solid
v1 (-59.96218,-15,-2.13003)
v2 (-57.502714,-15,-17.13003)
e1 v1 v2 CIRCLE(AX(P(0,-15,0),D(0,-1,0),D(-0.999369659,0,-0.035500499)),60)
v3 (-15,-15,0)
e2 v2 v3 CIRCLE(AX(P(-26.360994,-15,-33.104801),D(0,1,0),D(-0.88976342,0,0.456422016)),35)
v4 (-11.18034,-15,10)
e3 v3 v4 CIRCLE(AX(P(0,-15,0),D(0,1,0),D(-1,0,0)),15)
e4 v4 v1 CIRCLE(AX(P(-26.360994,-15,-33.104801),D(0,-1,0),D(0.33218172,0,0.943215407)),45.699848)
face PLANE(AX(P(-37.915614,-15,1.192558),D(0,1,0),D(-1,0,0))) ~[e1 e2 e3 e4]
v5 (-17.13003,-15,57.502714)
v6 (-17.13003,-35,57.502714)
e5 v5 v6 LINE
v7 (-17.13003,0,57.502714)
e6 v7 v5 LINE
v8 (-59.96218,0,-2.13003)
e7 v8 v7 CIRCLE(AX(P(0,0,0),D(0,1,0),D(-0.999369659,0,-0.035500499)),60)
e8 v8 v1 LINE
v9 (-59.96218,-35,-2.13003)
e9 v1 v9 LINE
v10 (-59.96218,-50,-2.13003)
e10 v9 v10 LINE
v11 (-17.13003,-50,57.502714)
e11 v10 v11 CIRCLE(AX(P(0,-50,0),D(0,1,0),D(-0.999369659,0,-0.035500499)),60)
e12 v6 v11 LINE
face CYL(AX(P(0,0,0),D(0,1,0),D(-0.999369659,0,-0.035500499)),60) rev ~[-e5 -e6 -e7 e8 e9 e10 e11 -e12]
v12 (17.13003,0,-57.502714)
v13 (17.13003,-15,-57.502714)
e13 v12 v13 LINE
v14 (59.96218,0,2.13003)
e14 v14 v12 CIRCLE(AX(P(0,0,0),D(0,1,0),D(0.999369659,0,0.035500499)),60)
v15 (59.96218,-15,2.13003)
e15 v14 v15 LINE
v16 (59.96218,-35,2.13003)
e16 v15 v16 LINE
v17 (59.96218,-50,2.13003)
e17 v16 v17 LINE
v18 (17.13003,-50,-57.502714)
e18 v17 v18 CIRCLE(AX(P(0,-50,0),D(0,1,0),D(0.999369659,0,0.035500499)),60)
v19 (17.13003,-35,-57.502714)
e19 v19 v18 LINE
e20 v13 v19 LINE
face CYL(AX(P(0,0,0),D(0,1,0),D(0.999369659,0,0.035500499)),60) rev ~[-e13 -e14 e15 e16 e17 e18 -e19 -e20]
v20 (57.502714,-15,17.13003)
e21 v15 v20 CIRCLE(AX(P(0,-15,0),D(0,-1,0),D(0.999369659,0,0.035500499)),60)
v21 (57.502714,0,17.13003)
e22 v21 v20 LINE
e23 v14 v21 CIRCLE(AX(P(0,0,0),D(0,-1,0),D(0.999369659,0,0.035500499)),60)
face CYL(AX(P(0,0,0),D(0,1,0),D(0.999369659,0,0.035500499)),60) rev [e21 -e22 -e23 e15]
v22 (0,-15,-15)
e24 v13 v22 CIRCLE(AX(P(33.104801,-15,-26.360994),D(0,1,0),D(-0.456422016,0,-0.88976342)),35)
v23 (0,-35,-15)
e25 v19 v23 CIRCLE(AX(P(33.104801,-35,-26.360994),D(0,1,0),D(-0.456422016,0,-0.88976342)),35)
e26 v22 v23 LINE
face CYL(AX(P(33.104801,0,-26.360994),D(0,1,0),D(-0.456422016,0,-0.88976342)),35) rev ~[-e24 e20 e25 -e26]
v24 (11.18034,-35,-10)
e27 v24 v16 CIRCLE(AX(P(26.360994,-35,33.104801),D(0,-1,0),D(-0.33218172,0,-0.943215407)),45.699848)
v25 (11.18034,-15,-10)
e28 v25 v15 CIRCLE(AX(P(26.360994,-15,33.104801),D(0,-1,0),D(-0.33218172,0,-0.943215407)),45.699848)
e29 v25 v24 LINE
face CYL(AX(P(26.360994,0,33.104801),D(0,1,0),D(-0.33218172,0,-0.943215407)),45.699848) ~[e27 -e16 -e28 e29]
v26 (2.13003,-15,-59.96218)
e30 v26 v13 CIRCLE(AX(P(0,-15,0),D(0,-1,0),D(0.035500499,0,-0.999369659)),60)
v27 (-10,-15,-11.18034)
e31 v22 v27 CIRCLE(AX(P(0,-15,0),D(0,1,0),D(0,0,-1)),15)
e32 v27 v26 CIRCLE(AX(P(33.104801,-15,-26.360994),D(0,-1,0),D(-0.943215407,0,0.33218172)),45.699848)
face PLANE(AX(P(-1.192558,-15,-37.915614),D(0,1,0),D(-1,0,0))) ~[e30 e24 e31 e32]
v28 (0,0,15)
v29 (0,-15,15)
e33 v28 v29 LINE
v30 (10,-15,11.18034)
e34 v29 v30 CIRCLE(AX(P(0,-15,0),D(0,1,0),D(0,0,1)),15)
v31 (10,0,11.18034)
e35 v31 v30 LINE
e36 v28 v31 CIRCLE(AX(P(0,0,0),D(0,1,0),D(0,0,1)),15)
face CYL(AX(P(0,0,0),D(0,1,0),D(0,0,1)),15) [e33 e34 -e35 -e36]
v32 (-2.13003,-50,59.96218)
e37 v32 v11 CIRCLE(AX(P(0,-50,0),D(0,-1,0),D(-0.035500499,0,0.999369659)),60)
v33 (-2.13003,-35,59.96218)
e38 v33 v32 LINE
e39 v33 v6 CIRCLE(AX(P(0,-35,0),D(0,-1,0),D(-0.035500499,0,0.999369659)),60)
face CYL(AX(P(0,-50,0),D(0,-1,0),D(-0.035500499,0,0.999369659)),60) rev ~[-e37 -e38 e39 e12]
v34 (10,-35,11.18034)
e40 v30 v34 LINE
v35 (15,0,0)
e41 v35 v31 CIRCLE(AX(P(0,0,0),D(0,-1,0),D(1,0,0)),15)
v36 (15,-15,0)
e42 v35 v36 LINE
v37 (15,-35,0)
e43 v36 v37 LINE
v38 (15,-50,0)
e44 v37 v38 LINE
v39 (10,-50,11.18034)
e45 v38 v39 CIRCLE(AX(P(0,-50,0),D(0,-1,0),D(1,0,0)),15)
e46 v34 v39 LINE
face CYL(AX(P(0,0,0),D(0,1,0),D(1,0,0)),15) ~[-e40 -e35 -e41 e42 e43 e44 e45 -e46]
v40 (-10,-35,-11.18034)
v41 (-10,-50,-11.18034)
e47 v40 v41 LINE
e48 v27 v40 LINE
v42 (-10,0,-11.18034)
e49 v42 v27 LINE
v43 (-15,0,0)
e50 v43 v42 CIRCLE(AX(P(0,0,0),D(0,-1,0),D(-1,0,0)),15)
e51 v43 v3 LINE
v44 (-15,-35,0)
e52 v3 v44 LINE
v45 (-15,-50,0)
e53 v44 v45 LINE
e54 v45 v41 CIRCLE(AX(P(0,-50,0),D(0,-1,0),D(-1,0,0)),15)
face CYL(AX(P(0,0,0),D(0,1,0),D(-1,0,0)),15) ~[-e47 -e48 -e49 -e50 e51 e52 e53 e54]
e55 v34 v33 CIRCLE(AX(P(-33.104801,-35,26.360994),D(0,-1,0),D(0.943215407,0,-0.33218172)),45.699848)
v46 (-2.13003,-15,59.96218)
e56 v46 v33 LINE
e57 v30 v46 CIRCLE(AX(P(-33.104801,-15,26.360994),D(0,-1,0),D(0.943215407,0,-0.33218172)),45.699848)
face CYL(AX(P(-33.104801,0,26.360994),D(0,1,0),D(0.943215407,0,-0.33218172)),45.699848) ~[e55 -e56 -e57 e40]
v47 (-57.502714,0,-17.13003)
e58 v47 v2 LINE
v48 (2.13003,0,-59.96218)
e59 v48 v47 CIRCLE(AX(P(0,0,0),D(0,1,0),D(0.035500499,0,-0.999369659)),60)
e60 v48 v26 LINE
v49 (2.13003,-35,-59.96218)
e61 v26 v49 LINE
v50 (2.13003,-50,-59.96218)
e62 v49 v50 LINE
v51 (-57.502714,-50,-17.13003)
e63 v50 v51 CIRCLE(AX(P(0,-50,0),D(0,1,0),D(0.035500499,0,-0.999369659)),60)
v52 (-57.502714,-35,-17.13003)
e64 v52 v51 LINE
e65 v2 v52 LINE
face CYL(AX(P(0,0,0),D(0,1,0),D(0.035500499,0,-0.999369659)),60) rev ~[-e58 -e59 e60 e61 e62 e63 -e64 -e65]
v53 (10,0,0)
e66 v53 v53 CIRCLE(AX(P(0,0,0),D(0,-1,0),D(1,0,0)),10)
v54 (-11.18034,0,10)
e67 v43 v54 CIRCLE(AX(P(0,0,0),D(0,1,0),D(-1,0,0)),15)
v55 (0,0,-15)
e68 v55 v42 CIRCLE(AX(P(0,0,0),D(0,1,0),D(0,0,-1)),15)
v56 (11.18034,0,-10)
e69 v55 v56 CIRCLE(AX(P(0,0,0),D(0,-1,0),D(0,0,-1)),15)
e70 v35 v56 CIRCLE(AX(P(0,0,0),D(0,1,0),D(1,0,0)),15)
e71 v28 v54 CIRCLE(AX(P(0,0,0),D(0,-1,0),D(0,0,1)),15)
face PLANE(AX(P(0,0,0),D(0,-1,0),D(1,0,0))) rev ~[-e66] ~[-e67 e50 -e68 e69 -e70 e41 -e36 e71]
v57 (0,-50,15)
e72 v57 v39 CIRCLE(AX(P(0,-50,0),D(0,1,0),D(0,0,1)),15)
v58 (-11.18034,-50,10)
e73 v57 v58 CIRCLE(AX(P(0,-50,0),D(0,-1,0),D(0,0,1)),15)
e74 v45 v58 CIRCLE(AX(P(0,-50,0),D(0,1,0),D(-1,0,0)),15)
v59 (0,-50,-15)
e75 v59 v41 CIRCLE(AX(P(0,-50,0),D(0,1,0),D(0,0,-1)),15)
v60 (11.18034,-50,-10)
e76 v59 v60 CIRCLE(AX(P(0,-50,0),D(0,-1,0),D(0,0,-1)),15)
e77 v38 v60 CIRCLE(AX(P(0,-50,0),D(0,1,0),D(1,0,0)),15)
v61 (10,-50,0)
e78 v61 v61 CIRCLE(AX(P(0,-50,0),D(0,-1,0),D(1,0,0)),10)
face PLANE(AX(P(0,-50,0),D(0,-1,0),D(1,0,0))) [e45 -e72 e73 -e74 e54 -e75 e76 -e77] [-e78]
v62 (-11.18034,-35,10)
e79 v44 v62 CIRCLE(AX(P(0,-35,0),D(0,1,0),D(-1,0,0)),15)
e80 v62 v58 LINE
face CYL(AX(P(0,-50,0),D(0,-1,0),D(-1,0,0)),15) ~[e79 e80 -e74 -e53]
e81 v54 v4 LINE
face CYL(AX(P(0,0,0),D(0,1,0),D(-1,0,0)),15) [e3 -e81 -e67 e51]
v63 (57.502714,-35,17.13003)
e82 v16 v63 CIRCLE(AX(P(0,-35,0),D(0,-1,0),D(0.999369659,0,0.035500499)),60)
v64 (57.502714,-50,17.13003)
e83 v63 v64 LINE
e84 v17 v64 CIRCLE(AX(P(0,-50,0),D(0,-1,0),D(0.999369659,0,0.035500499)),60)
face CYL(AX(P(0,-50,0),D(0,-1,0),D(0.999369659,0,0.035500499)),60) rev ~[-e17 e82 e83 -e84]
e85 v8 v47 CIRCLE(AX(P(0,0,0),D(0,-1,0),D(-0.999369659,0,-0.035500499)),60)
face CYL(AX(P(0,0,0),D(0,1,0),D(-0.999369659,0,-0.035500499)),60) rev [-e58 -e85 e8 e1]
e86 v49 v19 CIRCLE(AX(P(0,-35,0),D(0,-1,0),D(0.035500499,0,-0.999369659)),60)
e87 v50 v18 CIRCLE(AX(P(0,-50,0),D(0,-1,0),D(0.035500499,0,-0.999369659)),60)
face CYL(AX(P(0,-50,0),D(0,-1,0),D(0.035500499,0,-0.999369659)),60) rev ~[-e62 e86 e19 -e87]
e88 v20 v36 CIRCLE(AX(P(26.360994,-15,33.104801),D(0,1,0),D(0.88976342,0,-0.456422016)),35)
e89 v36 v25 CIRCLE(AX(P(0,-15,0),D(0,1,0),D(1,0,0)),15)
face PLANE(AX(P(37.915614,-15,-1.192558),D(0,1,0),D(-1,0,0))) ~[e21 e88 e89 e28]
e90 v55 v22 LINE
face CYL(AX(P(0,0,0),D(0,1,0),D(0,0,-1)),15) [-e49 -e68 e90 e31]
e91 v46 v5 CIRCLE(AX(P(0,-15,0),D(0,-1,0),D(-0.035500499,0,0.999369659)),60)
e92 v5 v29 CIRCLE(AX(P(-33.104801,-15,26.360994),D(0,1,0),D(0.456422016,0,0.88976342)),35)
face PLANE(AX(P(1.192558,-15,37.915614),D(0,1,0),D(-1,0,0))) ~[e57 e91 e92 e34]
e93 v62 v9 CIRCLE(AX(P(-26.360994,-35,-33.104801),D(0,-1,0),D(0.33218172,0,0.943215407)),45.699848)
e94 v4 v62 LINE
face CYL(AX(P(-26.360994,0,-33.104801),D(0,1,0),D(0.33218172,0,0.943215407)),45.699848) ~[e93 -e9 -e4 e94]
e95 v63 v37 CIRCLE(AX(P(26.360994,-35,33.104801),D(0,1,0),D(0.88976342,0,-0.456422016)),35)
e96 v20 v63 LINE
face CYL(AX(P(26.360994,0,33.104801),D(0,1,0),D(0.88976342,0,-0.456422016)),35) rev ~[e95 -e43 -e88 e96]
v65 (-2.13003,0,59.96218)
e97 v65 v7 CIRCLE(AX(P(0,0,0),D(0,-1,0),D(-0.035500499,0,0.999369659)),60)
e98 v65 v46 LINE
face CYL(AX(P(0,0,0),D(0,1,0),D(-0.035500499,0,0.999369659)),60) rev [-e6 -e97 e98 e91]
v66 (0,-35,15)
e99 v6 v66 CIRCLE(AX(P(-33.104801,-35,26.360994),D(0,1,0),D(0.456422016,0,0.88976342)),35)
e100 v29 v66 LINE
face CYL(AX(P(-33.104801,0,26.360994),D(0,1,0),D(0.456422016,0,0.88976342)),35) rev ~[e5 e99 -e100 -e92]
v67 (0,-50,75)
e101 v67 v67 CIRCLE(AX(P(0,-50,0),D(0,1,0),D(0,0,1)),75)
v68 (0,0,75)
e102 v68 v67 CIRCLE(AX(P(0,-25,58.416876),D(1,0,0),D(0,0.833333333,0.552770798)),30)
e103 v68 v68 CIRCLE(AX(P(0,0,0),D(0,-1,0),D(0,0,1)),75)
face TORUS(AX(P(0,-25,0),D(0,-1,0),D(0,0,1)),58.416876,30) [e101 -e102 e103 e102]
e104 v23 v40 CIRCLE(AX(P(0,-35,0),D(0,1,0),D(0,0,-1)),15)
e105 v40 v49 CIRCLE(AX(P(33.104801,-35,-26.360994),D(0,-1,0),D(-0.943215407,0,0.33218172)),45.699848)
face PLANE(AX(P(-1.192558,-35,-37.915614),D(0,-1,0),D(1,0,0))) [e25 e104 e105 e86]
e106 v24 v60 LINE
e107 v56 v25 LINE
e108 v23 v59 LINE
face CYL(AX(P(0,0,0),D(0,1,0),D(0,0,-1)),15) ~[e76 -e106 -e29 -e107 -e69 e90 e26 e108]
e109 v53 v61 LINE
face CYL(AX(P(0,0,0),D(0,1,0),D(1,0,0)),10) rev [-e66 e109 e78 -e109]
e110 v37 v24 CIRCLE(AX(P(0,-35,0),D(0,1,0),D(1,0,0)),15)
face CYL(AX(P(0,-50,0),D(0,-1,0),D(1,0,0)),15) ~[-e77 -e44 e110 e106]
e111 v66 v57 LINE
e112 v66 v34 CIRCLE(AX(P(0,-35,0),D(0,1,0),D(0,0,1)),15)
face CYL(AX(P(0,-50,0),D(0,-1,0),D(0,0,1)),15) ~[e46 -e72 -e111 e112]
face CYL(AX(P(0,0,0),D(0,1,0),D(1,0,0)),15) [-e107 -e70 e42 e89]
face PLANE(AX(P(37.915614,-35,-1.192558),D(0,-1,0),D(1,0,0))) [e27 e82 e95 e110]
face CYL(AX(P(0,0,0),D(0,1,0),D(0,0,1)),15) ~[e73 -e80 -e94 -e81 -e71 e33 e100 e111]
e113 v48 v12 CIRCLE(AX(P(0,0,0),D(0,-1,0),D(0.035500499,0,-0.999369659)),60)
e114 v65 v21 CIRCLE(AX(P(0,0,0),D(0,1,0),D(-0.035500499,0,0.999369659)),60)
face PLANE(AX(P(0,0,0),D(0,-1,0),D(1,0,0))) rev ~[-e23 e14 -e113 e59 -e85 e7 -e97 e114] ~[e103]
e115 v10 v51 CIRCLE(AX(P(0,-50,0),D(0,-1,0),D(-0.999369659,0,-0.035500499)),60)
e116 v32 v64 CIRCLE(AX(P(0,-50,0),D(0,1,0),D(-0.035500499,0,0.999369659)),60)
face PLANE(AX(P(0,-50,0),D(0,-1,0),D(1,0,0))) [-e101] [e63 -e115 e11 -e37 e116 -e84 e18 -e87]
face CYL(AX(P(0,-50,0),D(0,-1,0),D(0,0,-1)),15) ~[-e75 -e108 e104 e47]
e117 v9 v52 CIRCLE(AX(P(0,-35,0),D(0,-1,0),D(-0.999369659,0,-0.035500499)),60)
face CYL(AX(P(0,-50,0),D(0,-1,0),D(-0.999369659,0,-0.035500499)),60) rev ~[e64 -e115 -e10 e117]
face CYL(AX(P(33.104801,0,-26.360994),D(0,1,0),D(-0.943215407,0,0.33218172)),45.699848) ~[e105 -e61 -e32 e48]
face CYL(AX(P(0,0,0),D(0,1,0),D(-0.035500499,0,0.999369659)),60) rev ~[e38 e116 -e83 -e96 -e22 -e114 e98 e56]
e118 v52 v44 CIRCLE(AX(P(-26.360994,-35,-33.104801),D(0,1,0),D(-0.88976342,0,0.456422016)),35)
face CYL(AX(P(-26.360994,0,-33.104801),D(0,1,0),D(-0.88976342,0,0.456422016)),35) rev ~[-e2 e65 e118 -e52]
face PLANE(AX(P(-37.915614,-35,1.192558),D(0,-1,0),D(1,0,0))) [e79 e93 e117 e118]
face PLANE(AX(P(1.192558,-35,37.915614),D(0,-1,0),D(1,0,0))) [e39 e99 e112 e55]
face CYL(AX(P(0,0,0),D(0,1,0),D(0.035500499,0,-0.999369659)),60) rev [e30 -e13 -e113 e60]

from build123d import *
from build123d import SkipClean  # not in build123d's __all__

# Parameters (mm, degrees)
F0_R     = 75
F0_R_2   = 10
F1_DEPTH = 50
F6_DEPTH = 15


# Not quite as in the source:
# - a pattern or mirror of a feature is missing from the dataset's text; its kind, count and spacing are read off the source's solid


with BuildPart() as f1:
    # F0 (on Front) → F1 (new body)
    with BuildSketch(Plane.XZ):
        Circle(F0_R)
        with BuildLine():
            ThreePointArc((-57.5027136201, -17.1300299569), (-39.4445240133, -0.6421875508), (-15, 0))
            ThreePointArc((-15, 0), (-13.6930639376, -6.123724357), (-10, -11.1803398875))
            ThreePointArc((-10, -11.1803398875), (-11.2445250944, -37.3888406037), (2.1300299569, -59.9621795166))
            ThreePointArc((2.1300299569, -59.9621795166), (-35.0025968036, -48.7321066342), (-57.5027136201, -17.1300299569))
        make_face(mode=Mode.SUBTRACT)
        with BuildLine():
            ThreePointArc((17.1300299569, -57.5027136201), (0.6421875508, -39.4445240133), (0, -15))
            ThreePointArc((0, -15), (6.123724357, -13.6930639376), (11.1803398875, -10))
            ThreePointArc((11.1803398875, -10), (37.3888406037, -11.2445250944), (59.9621795166, 2.1300299569))
            ThreePointArc((59.9621795166, 2.1300299569), (48.7321066342, -35.0025968036), (17.1300299569, -57.5027136201))
        make_face(mode=Mode.SUBTRACT)
        with BuildLine():
            ThreePointArc((-59.9621795166, -2.1300299569), (-48.7321066342, 35.0025968036), (-17.1300299569, 57.5027136201))
            ThreePointArc((-17.1300299569, 57.5027136201), (-0.6421875508, 39.4445240133), (0, 15))
            ThreePointArc((0, 15), (-6.123724357, 13.6930639376), (-11.1803398875, 10))
            ThreePointArc((-11.1803398875, 10), (-37.3888406037, 11.2445250944), (-59.9621795166, -2.1300299569))
        make_face(mode=Mode.SUBTRACT)
        Circle(F0_R_2, mode=Mode.SUBTRACT)
        with BuildLine():
            ThreePointArc((15, 0), (13.6930639376, 6.123724357), (10, 11.1803398875))
            ThreePointArc((10, 11.1803398875), (11.2445250944, 37.3888406037), (-2.1300299569, 59.9621795166))
            ThreePointArc((-2.1300299569, 59.9621795166), (35.0025968036, 48.7321066342), (57.5027136201, 17.1300299569))
            ThreePointArc((57.5027136201, 17.1300299569), (39.4445240133, 0.6421875508), (15, 0))
        make_face(mode=Mode.SUBTRACT)
    extrude(amount=F1_DEPTH)

    # F2 (on Right) → F3 (revolve)
    with BuildSketch(Plane.YZ):
        with BuildLine():
            Line((-50, 75), (0, 75))
            ThreePointArc((0, 75), (-25, 88.4168760482), (-50, 75))
        make_face()
    revolve(axis=Axis((0, -25, 0), (0, -1, 0)))

    # F5 (on face) → F6 (cut)
    with BuildSketch(Plane.XZ.offset(50)):
        with BuildLine():
            ThreePointArc((-17.1300299569, 57.5027136201), (-0.6421875508, 39.4445240133), (0, 15))
            ThreePointArc((0, 15), (5.3523313466, 14.0125853844), (10, 11.1803398875))
            ThreePointArc((10, 11.1803398875), (11.2445250944, 37.3888406037), (-2.1300299569, 59.9621795166))
            ThreePointArc((-2.1300299569, 59.9621795166), (-9.7082295036, 59.2093766215), (-17.1300299569, 57.5027136201))
        make_face()
        with BuildLine():
            ThreePointArc((57.5027136201, 17.1300299569), (39.4445240133, 0.6421875508), (15, 0))
            ThreePointArc((15, 0), (14.0125853844, -5.3523313466), (11.1803398875, -10))
            ThreePointArc((11.1803398875, -10), (37.3888406037, -11.2445250944), (59.9621795166, 2.1300299569))
            ThreePointArc((59.9621795166, 2.1300299569), (59.2093766215, 9.7082295036), (57.5027136201, 17.1300299569))
        make_face()
        with BuildLine():
            ThreePointArc((17.1300299569, -57.5027136201), (0.6421875508, -39.4445240133), (0, -15))
            ThreePointArc((0, -15), (-5.3523313466, -14.0125853844), (-10, -11.1803398875))
            ThreePointArc((-10, -11.1803398875), (-11.2445250944, -37.3888406037), (2.1300299569, -59.9621795166))
            ThreePointArc((2.1300299569, -59.9621795166), (9.7082295036, -59.2093766215), (17.1300299569, -57.5027136201))
        make_face()
        with BuildLine():
            ThreePointArc((-57.5027136201, -17.1300299569), (-39.4445240133, -0.6421875508), (-15, 0))
            ThreePointArc((-15, 0), (-14.0125853844, 5.3523313466), (-11.1803398875, 10))
            ThreePointArc((-11.1803398875, 10), (-37.3888406037, 11.2445250944), (-59.9621795166, -2.1300299569))
            ThreePointArc((-59.9621795166, -2.1300299569), (-59.2093766215, -9.7082295036), (-57.5027136201, -17.1300299569))
        make_face()
    with SkipClean():  # cleaning this boolean's faces spoils the solid; the shape is the same uncleaned
        f6 = extrude(amount=-F6_DEPTH, mode=Mode.SUBTRACT)

    # F6_copies: F6 across plane
    with SkipClean():  # cleaning this boolean's faces spoils the solid; the shape is the same uncleaned
        add(f6.mirror(Plane.ZX.offset(-25)), clean=False, mode=Mode.SUBTRACT)


solid = f1.part
